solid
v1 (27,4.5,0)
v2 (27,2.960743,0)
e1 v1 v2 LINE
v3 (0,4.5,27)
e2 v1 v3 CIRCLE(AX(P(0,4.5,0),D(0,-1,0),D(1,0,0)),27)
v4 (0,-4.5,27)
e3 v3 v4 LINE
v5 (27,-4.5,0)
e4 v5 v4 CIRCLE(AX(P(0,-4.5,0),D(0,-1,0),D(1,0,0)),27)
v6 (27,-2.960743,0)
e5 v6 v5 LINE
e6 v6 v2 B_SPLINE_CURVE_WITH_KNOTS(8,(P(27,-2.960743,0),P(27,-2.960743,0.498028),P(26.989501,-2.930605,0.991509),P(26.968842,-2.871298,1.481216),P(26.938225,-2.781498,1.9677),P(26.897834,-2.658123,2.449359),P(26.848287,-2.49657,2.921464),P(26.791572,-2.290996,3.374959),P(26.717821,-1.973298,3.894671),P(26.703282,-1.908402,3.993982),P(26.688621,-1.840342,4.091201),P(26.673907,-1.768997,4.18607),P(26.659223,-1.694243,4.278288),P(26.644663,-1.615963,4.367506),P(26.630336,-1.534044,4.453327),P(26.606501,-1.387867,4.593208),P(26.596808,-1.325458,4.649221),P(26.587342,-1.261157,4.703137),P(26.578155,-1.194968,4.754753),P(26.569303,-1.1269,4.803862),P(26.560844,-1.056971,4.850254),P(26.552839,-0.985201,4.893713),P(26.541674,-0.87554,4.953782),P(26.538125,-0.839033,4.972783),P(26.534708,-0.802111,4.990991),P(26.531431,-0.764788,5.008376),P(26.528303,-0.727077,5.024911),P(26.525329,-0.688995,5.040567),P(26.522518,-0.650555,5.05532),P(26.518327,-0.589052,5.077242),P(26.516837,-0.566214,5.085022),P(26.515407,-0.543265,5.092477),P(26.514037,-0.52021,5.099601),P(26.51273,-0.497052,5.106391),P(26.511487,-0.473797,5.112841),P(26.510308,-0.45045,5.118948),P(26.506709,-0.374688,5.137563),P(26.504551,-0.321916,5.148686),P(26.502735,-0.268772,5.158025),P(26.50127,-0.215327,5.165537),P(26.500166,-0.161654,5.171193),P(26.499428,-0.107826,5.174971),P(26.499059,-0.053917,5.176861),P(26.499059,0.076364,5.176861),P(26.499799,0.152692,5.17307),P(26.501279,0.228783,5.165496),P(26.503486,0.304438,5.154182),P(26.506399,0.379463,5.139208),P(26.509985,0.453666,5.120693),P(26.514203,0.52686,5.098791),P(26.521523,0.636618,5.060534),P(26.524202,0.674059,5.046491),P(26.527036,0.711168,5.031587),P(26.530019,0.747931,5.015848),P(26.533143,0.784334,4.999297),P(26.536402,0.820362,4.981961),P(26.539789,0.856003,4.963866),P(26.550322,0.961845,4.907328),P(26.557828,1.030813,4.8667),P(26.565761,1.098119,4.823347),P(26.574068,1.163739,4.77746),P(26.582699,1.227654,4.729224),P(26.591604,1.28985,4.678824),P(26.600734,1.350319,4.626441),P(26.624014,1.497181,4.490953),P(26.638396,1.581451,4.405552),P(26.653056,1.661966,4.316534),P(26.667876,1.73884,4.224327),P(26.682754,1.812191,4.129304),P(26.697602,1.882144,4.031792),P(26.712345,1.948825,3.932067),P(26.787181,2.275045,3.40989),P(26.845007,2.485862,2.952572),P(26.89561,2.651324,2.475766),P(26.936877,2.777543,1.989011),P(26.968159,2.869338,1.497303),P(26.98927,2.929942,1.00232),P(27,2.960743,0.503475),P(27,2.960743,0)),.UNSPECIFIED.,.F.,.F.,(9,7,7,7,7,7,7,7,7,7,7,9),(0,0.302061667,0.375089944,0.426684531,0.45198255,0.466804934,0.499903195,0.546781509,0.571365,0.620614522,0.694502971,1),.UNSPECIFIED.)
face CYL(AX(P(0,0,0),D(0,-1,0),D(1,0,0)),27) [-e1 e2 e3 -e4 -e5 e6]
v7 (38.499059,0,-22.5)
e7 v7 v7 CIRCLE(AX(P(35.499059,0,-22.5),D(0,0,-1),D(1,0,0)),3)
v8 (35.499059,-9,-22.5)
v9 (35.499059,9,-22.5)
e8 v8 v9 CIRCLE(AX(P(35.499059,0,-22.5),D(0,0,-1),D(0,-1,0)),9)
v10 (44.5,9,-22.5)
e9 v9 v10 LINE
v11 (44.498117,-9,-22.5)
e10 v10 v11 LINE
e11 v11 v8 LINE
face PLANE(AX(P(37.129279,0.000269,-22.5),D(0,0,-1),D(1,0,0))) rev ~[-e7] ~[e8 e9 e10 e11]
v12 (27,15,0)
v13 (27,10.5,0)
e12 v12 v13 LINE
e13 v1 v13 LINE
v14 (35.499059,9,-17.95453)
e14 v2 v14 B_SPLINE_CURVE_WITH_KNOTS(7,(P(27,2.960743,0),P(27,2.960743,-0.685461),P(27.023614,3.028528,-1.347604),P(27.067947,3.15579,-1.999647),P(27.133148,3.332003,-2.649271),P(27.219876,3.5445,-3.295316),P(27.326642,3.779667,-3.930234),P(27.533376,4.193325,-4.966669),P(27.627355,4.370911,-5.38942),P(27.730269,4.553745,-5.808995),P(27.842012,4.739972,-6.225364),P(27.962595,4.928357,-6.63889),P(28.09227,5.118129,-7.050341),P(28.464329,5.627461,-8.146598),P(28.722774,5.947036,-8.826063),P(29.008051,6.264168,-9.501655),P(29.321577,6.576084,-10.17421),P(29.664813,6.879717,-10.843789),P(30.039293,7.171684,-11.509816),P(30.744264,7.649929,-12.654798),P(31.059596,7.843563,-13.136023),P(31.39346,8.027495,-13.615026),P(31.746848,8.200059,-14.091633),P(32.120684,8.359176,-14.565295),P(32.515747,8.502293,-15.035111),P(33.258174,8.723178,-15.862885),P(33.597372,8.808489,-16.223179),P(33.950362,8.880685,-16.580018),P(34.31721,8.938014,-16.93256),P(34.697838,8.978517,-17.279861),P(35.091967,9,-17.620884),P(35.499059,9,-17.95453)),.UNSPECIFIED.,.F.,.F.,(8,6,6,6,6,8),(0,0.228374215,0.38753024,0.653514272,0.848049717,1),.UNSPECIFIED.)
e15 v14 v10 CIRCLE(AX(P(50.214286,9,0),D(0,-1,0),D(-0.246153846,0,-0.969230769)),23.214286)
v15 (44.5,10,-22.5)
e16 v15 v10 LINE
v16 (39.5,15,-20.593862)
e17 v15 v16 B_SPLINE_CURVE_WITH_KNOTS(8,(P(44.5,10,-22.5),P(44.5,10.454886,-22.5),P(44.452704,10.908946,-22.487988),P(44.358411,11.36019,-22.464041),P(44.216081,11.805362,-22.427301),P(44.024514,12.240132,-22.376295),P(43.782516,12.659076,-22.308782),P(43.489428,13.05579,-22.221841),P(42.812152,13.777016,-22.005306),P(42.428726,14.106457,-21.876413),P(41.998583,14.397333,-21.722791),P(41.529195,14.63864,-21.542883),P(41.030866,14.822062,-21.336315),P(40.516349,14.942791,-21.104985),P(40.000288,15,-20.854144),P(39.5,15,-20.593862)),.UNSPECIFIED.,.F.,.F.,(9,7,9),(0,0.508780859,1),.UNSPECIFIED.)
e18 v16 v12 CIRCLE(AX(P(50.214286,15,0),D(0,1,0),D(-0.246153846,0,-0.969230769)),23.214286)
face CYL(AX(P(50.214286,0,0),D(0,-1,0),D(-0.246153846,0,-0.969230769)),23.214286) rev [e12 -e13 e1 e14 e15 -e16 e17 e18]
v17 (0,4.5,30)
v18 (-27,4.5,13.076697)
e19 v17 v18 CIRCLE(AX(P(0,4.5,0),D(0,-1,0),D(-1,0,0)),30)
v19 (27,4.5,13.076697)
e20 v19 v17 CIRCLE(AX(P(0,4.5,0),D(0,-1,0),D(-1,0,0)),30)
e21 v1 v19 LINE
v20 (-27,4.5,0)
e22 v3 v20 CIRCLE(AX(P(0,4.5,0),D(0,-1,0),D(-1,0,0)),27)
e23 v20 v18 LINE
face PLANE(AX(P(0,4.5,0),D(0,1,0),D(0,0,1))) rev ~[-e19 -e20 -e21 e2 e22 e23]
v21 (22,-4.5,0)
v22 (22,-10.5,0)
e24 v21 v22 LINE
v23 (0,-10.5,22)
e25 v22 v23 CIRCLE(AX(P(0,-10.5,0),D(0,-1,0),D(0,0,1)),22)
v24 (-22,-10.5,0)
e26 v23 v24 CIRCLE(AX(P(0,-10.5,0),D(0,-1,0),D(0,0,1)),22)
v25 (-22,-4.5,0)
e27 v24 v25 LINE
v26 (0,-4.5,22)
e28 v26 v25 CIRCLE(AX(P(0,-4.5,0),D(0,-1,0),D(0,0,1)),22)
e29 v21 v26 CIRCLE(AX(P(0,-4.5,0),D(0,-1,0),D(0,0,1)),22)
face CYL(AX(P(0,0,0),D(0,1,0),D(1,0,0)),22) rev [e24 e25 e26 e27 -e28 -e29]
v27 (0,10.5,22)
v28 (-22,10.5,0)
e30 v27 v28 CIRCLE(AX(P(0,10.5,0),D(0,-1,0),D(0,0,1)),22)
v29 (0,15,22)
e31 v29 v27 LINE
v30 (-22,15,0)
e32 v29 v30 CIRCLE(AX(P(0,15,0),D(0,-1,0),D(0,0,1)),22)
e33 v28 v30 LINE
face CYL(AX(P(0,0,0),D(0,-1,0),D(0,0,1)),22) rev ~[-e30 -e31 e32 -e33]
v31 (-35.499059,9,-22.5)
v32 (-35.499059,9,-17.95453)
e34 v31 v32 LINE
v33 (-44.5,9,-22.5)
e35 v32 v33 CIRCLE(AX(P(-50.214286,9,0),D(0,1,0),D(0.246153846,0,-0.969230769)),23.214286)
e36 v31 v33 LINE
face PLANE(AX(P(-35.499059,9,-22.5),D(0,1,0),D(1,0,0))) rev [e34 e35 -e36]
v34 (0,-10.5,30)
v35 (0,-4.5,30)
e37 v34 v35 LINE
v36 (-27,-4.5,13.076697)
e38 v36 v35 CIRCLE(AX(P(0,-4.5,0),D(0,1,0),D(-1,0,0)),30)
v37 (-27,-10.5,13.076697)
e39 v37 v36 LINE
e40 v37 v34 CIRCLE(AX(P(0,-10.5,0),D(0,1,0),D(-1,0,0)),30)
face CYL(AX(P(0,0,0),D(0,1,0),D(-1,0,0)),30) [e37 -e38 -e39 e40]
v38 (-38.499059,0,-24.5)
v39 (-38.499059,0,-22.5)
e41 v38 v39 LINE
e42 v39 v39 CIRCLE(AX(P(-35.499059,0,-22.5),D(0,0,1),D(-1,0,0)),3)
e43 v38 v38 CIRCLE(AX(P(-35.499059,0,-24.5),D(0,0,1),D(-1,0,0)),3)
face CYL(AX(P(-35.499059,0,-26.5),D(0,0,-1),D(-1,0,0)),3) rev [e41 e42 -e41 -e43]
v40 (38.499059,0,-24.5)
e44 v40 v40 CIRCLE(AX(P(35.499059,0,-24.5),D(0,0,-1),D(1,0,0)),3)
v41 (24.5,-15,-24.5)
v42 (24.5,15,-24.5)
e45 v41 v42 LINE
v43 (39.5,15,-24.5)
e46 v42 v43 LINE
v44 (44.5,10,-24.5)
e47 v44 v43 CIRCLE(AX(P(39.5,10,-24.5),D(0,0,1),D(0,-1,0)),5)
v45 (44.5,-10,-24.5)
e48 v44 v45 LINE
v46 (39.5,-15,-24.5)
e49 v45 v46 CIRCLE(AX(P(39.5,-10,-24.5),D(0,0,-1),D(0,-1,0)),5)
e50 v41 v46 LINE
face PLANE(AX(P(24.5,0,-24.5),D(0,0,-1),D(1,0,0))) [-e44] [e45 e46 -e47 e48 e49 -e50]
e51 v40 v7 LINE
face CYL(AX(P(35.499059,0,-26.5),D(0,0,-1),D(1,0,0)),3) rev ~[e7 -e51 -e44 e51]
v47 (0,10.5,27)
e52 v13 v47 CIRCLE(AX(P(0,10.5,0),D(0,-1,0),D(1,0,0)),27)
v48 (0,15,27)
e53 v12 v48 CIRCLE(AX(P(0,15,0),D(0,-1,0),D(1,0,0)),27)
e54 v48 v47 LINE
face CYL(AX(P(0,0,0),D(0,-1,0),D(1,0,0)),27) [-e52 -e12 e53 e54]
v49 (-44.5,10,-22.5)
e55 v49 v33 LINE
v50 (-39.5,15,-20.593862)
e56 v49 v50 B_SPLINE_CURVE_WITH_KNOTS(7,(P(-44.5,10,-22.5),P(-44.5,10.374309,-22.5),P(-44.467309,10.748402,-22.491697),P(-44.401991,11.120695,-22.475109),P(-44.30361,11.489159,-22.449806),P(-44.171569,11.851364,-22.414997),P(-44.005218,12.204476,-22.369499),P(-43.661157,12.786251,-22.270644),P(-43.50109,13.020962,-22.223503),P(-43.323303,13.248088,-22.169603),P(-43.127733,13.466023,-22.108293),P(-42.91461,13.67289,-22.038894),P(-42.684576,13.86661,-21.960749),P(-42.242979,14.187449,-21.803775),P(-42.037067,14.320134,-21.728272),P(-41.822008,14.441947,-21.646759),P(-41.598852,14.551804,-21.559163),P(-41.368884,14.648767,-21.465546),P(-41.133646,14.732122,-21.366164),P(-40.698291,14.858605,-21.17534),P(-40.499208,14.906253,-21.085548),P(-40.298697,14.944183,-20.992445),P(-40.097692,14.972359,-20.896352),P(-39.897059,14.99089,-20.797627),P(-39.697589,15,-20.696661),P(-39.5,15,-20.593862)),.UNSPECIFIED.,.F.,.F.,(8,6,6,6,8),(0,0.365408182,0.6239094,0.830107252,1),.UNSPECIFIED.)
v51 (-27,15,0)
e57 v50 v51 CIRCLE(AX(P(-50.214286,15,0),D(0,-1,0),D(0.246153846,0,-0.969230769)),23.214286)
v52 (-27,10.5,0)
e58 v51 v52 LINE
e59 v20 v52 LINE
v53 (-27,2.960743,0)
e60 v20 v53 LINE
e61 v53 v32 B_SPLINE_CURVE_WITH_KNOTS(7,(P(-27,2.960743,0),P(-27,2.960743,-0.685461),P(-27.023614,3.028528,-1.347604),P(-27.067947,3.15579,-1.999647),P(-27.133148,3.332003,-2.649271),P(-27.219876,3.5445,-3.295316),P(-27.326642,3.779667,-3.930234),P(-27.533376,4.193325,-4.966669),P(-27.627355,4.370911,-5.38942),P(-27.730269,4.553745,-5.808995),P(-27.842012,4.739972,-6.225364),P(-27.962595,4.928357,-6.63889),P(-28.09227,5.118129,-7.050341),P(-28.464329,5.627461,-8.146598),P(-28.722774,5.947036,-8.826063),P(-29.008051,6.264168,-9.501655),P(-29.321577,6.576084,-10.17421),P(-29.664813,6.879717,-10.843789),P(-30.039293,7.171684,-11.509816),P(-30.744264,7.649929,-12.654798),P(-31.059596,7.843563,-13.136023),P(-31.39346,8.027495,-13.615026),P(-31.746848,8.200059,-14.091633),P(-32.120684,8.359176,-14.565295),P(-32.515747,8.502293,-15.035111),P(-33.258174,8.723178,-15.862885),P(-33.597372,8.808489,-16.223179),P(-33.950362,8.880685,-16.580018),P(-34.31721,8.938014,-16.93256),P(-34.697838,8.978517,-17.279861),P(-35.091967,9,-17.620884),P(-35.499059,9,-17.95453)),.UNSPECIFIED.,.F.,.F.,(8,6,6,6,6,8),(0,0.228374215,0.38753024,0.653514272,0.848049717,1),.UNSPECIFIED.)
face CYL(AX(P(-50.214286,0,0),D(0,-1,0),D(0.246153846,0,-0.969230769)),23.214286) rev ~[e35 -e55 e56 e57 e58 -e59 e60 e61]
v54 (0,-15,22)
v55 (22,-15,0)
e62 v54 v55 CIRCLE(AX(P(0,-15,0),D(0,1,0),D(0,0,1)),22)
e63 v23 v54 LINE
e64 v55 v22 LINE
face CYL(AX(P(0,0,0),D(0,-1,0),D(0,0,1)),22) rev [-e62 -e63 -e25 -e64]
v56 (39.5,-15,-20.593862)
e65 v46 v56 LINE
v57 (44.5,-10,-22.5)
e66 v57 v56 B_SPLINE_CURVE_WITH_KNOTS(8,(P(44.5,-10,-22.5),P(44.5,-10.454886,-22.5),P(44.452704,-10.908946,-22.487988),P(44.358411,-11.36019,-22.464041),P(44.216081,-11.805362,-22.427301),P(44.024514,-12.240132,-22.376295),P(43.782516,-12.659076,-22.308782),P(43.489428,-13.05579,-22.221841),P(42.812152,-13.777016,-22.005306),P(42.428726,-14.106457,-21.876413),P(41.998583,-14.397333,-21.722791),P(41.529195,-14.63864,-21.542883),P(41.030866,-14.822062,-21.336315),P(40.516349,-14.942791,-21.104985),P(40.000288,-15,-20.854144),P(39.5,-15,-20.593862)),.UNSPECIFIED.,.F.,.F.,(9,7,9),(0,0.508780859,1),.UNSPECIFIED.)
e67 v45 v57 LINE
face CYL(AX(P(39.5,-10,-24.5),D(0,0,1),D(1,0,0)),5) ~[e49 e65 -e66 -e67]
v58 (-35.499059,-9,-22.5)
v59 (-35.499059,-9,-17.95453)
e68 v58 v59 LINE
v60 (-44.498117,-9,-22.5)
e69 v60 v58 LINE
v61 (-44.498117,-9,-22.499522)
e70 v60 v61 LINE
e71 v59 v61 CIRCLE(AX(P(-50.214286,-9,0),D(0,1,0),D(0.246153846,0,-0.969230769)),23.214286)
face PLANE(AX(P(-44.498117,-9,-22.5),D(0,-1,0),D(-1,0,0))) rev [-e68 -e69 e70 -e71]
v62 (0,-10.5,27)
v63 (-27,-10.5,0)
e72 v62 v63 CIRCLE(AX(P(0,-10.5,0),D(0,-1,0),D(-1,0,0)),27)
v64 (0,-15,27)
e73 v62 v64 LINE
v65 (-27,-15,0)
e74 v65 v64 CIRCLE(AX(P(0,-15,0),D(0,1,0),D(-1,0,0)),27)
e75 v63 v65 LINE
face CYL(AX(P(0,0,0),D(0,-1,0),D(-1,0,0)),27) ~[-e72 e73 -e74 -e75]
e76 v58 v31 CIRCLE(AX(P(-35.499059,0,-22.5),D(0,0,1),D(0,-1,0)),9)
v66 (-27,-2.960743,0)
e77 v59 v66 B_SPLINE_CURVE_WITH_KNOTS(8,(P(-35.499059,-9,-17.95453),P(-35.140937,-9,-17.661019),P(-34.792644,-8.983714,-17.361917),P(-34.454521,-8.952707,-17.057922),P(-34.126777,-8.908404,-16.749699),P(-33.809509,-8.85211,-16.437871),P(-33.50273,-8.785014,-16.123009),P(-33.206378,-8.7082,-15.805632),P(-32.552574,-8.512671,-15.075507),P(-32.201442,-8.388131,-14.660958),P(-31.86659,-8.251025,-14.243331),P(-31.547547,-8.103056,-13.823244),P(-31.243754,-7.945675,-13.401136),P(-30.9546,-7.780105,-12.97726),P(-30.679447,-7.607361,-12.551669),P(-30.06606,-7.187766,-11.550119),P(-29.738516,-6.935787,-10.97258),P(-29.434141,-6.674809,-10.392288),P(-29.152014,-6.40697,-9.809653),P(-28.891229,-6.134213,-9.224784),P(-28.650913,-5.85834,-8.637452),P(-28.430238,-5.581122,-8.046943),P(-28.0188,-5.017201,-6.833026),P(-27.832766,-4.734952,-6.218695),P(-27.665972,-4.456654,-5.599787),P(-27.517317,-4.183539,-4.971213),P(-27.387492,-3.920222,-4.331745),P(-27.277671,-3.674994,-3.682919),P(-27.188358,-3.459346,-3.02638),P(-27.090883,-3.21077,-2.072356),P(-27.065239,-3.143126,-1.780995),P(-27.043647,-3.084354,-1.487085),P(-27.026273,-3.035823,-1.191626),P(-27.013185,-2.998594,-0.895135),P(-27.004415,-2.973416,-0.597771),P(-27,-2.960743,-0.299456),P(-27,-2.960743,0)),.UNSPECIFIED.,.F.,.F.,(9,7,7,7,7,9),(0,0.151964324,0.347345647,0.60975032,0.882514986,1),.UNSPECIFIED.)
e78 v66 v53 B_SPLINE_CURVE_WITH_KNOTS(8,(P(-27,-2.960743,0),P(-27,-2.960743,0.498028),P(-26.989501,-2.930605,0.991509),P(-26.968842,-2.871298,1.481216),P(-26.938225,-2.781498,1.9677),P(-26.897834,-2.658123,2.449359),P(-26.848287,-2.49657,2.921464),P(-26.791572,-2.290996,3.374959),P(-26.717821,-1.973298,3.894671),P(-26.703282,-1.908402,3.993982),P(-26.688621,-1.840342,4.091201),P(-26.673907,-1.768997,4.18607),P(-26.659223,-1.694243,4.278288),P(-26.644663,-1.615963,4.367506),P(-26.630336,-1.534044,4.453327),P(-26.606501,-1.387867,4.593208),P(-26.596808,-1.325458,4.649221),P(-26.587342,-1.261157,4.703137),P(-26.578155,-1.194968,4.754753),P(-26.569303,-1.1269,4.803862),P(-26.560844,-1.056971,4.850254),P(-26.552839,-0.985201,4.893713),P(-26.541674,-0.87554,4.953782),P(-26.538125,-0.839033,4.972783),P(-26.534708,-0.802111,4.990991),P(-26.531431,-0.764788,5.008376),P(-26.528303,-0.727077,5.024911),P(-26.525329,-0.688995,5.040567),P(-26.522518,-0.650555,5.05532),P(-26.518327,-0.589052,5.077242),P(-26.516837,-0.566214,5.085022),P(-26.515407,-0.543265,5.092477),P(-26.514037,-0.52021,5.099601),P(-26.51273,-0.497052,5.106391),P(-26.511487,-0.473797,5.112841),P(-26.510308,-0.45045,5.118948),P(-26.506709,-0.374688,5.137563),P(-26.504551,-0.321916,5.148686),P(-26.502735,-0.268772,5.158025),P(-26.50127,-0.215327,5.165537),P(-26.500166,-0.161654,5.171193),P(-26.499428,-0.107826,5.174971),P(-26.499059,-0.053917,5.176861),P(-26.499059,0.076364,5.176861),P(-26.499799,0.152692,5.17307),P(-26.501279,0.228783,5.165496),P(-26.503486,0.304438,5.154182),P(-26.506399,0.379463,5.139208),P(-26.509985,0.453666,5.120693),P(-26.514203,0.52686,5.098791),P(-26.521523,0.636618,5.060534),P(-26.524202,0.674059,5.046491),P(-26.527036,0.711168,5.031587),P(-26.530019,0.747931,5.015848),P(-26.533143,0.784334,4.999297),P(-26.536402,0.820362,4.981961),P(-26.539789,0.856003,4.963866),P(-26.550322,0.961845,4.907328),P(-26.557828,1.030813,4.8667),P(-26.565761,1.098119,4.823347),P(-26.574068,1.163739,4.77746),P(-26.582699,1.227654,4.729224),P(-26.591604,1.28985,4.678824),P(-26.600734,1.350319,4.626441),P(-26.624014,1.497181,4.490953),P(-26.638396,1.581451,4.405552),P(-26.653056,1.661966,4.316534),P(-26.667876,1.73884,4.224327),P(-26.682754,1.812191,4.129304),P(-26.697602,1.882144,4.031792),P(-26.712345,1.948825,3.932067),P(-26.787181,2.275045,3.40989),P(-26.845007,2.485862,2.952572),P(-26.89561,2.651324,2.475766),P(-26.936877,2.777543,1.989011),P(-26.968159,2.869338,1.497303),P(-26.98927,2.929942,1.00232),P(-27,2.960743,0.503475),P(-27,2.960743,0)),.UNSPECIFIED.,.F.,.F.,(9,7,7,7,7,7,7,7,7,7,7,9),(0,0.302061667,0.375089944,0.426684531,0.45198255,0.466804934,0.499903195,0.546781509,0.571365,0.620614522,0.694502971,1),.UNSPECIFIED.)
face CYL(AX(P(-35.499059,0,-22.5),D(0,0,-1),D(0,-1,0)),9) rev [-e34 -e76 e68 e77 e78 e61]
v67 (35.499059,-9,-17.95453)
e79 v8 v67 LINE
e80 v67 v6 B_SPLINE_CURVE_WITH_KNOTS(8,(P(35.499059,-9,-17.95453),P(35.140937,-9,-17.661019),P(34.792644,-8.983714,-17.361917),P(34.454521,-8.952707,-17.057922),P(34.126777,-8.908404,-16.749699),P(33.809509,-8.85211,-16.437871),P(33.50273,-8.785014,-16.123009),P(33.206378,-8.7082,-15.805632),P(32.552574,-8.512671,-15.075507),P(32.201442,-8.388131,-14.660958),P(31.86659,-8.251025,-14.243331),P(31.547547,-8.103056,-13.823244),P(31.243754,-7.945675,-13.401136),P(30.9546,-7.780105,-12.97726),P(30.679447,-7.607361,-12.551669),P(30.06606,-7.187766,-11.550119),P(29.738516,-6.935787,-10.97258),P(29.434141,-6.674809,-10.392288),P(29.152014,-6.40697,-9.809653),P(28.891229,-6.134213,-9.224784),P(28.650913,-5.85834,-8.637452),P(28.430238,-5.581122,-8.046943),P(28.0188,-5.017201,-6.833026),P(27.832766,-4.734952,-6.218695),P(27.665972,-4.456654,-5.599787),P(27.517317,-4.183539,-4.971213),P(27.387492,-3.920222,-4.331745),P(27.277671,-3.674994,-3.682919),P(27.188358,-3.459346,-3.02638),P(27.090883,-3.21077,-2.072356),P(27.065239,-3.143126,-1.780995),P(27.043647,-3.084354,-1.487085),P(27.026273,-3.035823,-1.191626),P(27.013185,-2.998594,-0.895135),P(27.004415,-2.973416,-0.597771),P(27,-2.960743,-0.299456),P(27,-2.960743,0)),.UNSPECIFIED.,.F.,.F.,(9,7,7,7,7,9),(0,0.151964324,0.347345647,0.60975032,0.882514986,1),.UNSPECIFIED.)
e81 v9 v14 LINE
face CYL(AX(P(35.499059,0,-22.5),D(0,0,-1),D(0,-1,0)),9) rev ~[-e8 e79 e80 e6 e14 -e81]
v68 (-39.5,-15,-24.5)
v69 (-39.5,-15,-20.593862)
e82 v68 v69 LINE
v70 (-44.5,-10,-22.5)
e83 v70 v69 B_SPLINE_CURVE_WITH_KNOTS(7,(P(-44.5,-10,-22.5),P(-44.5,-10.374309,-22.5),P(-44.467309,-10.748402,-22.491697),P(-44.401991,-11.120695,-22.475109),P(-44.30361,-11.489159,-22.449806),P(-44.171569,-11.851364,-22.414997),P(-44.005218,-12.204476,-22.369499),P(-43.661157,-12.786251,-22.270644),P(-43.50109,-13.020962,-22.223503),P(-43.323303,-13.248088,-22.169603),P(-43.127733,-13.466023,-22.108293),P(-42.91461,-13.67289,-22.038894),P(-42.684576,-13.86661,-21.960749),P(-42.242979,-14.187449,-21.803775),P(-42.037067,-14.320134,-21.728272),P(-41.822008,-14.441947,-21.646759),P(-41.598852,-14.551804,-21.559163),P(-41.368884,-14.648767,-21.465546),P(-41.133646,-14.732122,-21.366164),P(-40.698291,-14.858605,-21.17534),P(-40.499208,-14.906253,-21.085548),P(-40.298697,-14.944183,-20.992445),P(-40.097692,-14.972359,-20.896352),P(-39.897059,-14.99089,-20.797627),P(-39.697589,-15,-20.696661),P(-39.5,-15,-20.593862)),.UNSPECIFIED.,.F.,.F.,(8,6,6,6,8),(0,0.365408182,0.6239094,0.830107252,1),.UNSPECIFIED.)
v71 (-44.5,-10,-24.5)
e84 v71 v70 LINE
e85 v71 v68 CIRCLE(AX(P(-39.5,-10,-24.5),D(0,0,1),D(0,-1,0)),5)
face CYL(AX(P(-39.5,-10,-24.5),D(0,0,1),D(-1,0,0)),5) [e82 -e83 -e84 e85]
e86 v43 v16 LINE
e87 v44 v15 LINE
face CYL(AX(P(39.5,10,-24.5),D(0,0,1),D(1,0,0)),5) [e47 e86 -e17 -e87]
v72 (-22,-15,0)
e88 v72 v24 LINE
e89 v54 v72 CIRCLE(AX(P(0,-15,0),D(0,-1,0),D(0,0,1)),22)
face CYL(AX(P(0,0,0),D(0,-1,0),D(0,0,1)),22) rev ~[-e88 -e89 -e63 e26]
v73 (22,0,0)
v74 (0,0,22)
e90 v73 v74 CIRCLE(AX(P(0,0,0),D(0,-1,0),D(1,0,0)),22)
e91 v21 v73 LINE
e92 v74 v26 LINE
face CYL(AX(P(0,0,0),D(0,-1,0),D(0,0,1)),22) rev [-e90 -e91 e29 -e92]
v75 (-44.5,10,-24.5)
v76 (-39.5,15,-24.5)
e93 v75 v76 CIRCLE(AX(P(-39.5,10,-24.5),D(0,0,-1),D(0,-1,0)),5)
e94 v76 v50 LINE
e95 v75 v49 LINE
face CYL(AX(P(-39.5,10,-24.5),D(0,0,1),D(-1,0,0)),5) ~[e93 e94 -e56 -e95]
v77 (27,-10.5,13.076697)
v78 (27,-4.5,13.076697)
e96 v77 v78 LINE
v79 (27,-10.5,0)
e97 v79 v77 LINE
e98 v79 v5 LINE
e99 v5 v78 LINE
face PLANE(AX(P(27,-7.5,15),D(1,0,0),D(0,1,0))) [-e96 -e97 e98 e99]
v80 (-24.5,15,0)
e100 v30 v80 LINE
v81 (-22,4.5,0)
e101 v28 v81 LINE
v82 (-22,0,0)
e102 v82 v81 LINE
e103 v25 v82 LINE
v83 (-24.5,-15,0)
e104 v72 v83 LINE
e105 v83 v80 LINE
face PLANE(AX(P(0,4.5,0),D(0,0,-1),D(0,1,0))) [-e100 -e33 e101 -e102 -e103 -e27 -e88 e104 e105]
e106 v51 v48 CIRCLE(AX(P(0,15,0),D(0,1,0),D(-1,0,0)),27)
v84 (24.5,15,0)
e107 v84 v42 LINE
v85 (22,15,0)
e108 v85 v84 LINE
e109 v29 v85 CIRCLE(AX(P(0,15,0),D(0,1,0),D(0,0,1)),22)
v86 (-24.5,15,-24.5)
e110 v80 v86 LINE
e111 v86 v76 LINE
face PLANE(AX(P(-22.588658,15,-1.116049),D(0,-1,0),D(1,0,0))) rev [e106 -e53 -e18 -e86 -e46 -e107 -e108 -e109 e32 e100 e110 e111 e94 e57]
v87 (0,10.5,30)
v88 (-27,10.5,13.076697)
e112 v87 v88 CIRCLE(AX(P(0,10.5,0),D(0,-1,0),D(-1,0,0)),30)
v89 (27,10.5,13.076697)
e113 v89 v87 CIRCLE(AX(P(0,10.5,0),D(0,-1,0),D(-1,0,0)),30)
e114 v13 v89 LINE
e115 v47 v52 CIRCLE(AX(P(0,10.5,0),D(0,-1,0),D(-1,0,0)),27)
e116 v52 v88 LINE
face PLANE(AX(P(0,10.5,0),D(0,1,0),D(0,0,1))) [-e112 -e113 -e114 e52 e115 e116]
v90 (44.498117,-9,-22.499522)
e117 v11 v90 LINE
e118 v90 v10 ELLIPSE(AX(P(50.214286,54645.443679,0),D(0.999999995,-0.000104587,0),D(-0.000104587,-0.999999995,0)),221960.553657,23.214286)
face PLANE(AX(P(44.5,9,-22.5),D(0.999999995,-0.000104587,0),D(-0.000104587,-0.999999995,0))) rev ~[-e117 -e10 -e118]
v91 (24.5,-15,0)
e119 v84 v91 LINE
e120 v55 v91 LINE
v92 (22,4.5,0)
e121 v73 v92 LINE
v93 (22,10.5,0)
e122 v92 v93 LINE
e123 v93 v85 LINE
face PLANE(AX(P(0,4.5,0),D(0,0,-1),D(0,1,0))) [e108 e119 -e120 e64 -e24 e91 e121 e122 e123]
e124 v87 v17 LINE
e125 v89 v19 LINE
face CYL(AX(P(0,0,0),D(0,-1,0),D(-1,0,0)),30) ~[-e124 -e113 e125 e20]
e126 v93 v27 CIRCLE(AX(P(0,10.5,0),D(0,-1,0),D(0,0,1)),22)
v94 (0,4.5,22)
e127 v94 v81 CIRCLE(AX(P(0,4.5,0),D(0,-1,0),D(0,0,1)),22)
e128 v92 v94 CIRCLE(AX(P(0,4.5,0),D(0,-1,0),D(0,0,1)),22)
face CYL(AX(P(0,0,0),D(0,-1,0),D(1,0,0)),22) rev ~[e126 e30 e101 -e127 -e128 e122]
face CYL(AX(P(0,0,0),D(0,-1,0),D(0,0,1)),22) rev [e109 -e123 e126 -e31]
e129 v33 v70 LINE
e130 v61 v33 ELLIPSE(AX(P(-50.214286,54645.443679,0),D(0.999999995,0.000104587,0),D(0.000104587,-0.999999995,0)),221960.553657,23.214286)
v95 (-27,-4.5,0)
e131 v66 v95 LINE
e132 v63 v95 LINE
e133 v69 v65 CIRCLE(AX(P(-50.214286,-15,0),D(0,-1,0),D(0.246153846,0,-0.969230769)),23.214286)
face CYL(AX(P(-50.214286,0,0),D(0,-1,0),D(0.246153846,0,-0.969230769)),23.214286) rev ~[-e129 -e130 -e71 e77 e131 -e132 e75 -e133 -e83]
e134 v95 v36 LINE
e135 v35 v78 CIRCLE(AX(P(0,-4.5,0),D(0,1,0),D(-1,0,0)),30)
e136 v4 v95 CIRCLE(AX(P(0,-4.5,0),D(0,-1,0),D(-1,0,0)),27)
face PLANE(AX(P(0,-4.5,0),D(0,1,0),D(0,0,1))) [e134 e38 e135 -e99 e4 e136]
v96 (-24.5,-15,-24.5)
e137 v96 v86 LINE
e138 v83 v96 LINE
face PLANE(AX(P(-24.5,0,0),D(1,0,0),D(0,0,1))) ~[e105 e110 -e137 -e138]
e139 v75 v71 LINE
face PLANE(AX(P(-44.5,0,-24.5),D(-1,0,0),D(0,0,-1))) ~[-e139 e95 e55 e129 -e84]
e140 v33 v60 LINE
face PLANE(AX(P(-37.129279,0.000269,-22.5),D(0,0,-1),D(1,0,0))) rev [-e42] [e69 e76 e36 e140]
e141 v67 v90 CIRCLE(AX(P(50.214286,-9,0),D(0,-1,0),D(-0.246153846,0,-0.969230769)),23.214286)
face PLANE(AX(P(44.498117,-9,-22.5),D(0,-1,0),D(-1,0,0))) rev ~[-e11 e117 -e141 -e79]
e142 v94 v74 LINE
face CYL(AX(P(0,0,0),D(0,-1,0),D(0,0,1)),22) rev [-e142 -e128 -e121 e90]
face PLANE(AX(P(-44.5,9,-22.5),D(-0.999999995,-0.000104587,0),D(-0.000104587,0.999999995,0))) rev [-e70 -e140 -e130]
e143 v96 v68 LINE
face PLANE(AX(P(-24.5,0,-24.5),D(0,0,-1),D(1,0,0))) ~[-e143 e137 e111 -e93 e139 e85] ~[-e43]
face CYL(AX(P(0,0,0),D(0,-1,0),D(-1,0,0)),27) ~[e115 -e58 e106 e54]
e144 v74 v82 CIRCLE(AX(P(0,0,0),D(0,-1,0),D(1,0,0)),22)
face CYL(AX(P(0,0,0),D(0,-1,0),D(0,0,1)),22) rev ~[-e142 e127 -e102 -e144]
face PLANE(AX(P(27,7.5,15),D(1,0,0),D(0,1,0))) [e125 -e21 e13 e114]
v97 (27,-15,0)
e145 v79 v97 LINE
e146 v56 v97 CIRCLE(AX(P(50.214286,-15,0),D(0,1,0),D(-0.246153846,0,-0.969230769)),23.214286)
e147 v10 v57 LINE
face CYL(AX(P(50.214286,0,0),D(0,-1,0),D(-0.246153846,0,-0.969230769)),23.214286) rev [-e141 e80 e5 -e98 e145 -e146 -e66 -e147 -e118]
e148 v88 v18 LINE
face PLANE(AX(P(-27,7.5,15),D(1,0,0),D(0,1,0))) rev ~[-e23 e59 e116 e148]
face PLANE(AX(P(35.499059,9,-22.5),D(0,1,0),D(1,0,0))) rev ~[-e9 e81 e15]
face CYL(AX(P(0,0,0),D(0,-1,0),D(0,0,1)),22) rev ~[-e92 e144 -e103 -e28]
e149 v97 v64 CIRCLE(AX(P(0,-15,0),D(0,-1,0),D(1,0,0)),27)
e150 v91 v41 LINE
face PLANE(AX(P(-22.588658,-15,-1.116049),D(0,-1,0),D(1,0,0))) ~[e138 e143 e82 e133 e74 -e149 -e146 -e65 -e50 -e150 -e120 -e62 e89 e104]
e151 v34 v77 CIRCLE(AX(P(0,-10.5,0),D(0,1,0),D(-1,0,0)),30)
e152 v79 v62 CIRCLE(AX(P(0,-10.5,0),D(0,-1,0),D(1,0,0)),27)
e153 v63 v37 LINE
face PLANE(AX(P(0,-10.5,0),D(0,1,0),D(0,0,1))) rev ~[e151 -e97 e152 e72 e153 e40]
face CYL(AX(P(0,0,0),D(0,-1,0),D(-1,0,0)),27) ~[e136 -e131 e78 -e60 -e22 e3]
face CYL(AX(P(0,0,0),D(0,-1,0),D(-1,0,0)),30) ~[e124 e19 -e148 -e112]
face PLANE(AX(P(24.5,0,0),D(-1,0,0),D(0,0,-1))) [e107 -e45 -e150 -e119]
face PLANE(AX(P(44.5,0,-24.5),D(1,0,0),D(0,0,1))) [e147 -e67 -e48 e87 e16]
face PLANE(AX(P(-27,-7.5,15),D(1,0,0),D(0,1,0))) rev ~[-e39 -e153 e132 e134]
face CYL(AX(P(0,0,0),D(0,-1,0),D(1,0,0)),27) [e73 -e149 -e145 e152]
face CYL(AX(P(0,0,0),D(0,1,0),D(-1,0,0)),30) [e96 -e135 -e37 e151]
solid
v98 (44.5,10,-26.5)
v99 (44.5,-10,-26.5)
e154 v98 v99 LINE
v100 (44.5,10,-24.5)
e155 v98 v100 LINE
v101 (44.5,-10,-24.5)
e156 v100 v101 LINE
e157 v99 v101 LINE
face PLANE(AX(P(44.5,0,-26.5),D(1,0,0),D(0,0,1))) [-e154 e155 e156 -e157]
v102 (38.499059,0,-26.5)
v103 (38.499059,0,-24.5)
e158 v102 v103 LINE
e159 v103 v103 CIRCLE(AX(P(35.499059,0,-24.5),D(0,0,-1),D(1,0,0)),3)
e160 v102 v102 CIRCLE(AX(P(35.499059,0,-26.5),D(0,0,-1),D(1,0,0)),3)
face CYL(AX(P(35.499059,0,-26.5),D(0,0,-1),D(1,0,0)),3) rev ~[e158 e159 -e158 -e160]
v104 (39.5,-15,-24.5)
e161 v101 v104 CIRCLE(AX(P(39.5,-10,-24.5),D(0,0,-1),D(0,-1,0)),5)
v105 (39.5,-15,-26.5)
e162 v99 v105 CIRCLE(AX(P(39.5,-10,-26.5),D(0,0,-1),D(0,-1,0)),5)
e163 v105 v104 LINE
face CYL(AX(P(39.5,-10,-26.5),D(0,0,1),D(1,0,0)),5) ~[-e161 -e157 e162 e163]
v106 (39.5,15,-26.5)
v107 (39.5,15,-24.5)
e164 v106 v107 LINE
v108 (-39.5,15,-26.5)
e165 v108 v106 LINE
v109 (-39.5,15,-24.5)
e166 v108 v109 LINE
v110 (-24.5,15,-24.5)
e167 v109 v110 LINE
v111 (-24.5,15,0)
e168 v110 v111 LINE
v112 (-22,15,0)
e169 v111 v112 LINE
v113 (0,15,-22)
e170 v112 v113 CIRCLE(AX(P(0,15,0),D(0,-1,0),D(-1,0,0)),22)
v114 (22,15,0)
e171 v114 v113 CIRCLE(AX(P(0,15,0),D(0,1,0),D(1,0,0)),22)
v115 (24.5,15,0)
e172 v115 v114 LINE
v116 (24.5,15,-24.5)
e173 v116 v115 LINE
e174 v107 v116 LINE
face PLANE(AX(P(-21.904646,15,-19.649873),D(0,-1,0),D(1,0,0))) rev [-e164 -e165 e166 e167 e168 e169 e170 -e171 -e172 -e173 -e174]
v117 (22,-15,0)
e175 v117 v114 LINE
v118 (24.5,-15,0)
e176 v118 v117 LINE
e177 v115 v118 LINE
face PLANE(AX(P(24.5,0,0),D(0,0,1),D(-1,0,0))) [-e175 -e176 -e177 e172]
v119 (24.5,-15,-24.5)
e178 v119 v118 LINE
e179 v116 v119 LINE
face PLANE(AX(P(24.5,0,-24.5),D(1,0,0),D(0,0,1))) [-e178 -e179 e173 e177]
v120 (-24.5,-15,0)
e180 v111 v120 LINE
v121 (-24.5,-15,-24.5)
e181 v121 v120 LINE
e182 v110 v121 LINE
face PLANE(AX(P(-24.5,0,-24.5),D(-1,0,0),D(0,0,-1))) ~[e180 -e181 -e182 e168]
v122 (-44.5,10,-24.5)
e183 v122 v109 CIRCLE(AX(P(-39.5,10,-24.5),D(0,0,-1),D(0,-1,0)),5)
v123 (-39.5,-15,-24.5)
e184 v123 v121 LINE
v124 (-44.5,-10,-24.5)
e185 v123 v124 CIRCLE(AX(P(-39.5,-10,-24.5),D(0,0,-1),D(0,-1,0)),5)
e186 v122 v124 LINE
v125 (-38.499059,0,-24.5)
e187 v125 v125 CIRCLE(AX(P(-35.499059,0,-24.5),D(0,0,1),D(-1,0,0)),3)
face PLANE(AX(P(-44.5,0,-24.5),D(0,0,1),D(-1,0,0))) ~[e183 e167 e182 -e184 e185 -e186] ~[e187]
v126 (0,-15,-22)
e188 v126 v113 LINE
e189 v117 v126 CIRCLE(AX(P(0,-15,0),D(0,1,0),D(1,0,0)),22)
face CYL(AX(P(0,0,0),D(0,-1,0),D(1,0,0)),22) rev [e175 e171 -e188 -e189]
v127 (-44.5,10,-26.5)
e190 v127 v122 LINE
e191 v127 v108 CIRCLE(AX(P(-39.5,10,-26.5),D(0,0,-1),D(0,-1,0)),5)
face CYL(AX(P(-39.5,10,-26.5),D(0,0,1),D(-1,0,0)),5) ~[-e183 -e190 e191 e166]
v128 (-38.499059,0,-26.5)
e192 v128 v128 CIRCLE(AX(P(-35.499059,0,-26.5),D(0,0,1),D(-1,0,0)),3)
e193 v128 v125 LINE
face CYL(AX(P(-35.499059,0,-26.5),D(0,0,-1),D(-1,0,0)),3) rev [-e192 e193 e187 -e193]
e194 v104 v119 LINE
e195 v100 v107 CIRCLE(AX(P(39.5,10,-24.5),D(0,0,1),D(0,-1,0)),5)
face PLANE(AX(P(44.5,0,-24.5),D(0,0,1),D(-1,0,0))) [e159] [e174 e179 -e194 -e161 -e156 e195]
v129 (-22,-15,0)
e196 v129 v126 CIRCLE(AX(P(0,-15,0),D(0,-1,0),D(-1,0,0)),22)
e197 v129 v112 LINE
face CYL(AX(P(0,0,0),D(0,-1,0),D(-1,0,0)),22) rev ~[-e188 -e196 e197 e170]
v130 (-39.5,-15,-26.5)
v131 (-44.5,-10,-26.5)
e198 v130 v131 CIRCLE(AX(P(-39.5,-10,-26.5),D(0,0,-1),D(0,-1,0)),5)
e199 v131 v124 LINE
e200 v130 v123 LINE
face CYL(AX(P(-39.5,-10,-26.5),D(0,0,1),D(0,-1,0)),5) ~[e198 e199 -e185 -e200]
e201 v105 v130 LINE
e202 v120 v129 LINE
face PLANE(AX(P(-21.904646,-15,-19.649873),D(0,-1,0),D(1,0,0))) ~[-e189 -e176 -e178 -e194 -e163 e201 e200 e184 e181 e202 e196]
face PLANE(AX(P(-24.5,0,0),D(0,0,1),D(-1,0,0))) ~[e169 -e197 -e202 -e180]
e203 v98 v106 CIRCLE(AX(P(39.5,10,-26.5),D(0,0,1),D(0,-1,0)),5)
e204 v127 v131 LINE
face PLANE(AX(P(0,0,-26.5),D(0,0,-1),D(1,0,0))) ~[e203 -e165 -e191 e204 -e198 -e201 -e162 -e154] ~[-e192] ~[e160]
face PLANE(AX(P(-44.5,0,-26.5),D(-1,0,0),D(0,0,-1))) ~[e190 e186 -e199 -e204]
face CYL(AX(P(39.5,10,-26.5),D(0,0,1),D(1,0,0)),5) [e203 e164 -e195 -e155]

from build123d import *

# Parameters (mm, degrees)
F1_DEPTH       = 15
F1_DEPTH_BACK  = 15
F2_DEPTH       = 15
F2_DEPTH_BACK  = 15
F3_R           = 3
F4_DEPTH       = 53.501
F7_START       = -4
F6_R           = 3
F7_DEPTH       = 36
F9_W           = 6
F9_H           = 30
F10_DEPTH      = 27
F10_DEPTH_BACK = 27
F12_R          = 5
F12_2_R        = 5
F11_R          = 22
F13_DEPTH      = 25
F13_DEPTH_BACK = 25


with BuildPart() as f1:
    # F0 (on Front) → F1 (new body, two sides)
    with BuildSketch(Plane.XZ) as f1_sk:
        with BuildLine():
            Line((0, -26.5), (44.5, -26.5))
            Line((44.5, -26.5), (44.5, -24.5))
            Line((44.5, -24.5), (24.5, -24.5))
            Line((24.5, -24.5), (24.5, 0))
            Line((24.5, 0), (22, 0))
            ThreePointArc((22, 0), (15.5563491861, -15.5563491861), (0, -22))
            Line((0, -22), (0, -26.5))
        make_face()
    extrude(amount=F1_DEPTH)
    extrude(f1_sk.sketch, amount=-F1_DEPTH_BACK)


with BuildPart() as f2:
    # F0 (on Front) → F2 (new body, two sides)
    with BuildSketch(Plane.XZ) as f2_sk:
        with BuildLine():
            Line((24.5, -24.5), (44.5, -24.5))
            Line((44.5, -24.5), (44.5, -22.5))
            Line((44.5, -22.5), (27, -22.5))
            Line((27, -22.5), (27, 0))
            ThreePointArc((27, 0), (19.091883092, 19.091883092), (0, 27))
            Line((0, 27), (0, 22))
            ThreePointArc((0, 22), (15.5563491861, 15.5563491861), (22, 0))
            Line((22, 0), (24.5, 0))
            Line((24.5, 0), (24.5, -24.5))
        make_face()
        with BuildLine():
            Line((27, -22.5), (44.5, -22.5))
            ThreePointArc((44.5, -22.5), (31.8900378109, -14.2521928137), (27, 0))
            Line((27, 0), (27, -22.5))
        make_face()
    extrude(amount=F2_DEPTH)
    extrude(f2_sk.sketch, amount=-F2_DEPTH_BACK)


with BuildPart() as f4_tool:
    # F3 (on face) → F4 (new body, through all)
    with BuildSketch(Plane(origin=(0, 0, -26.5), x_dir=(1, 0, 0), z_dir=(0, 0, -1))):
        with Locations((35.4990586638, 0)):
            Circle(F3_R)
    extrude(amount=-F4_DEPTH)


with BuildPart() as f1_1:
    add(f1.part)

    # F4: cut by f4_tool
    add(f4_tool.part, mode=Mode.SUBTRACT)

    # F5: F1 across plane


with BuildPart() as f2_1:
    add(f2.part)

    # F4: cut by f4_tool
    add(f4_tool.part, mode=Mode.SUBTRACT)

    # F6 (on face) → F7 (cut)
    with BuildSketch(Plane(origin=(0, 0, -26.5), x_dir=(1, 0, 0), z_dir=(0, 0, -1)).offset(F7_START)):
        with BuildLine():
            Line((35.4990586638, -9), (44.5, -9))
            Line((44.5, -9), (44.4981174261, 9))
            Line((44.4981174261, 9), (35.4990586638, 9))
            ThreePointArc((35.4990586638, 9), (26.4990586638, 0), (35.4990586638, -9))
        make_face()
        with Locations((35.4990586638, 0)):
            Circle(F6_R, mode=Mode.SUBTRACT)
    extrude(amount=-F7_DEPTH, mode=Mode.SUBTRACT)

    # F8: F2 across plane


with BuildPart() as f1_2:
    add(f1_1.part)
    add(f1_1.part.mirror(Plane.YZ))

    # F12
    f12_edges = [f1_2.edges().sort_by_distance(p)[0] for p in [
        (-44.5, 15, -25.5),
        (-44.5, -15, -25.5),
        (44.5, -15, -25.5),
        (44.5, 15, -25.5),
    ]]
    fillet(f12_edges, radius=F12_R)


with BuildPart() as f2_2:
    add(f2_1.part)
    add(f2_1.part.mirror(Plane.YZ))

    # F9 (on Right) → F10 (join, two sides)
    with BuildSketch(Plane.YZ) as f10_sk:
        with Locations((7.5, 15)):
            Rectangle(F9_W, F9_H)
        with Locations((-7.5, 15)):
            Rectangle(F9_W, F9_H)
    extrude(amount=F10_DEPTH)
    extrude(f10_sk.sketch, amount=-F10_DEPTH_BACK)

    # F12#2
    f12_2_edges = [f2_2.edges().sort_by_distance(p)[0] for p in [
        (-44.5, 15, -23.5),
        (-44.5, -15, -23.5),
        (44.5, -15, -23.5),
        (44.5, 15, -23.5),
    ]]
    fillet(f12_2_edges, radius=F12_2_R)

    # F11 (on Front) → F13 (cut, two sides)
    with BuildSketch(Plane.XZ) as f13_sk:
        with BuildLine():
            Line((30, 0), (42, 0))
            ThreePointArc((42, 0), (0, 42), (-42, 0))
            Line((-42, 0), (-30, 0))
            ThreePointArc((-30, 0), (0, 30), (30, 0))
        make_face()
        Circle(F11_R)
    extrude(amount=-F13_DEPTH, mode=Mode.SUBTRACT)
    extrude(f13_sk.sketch, amount=F13_DEPTH_BACK, mode=Mode.SUBTRACT)


solid = Compound([f1_2.part, f2_2.part])
